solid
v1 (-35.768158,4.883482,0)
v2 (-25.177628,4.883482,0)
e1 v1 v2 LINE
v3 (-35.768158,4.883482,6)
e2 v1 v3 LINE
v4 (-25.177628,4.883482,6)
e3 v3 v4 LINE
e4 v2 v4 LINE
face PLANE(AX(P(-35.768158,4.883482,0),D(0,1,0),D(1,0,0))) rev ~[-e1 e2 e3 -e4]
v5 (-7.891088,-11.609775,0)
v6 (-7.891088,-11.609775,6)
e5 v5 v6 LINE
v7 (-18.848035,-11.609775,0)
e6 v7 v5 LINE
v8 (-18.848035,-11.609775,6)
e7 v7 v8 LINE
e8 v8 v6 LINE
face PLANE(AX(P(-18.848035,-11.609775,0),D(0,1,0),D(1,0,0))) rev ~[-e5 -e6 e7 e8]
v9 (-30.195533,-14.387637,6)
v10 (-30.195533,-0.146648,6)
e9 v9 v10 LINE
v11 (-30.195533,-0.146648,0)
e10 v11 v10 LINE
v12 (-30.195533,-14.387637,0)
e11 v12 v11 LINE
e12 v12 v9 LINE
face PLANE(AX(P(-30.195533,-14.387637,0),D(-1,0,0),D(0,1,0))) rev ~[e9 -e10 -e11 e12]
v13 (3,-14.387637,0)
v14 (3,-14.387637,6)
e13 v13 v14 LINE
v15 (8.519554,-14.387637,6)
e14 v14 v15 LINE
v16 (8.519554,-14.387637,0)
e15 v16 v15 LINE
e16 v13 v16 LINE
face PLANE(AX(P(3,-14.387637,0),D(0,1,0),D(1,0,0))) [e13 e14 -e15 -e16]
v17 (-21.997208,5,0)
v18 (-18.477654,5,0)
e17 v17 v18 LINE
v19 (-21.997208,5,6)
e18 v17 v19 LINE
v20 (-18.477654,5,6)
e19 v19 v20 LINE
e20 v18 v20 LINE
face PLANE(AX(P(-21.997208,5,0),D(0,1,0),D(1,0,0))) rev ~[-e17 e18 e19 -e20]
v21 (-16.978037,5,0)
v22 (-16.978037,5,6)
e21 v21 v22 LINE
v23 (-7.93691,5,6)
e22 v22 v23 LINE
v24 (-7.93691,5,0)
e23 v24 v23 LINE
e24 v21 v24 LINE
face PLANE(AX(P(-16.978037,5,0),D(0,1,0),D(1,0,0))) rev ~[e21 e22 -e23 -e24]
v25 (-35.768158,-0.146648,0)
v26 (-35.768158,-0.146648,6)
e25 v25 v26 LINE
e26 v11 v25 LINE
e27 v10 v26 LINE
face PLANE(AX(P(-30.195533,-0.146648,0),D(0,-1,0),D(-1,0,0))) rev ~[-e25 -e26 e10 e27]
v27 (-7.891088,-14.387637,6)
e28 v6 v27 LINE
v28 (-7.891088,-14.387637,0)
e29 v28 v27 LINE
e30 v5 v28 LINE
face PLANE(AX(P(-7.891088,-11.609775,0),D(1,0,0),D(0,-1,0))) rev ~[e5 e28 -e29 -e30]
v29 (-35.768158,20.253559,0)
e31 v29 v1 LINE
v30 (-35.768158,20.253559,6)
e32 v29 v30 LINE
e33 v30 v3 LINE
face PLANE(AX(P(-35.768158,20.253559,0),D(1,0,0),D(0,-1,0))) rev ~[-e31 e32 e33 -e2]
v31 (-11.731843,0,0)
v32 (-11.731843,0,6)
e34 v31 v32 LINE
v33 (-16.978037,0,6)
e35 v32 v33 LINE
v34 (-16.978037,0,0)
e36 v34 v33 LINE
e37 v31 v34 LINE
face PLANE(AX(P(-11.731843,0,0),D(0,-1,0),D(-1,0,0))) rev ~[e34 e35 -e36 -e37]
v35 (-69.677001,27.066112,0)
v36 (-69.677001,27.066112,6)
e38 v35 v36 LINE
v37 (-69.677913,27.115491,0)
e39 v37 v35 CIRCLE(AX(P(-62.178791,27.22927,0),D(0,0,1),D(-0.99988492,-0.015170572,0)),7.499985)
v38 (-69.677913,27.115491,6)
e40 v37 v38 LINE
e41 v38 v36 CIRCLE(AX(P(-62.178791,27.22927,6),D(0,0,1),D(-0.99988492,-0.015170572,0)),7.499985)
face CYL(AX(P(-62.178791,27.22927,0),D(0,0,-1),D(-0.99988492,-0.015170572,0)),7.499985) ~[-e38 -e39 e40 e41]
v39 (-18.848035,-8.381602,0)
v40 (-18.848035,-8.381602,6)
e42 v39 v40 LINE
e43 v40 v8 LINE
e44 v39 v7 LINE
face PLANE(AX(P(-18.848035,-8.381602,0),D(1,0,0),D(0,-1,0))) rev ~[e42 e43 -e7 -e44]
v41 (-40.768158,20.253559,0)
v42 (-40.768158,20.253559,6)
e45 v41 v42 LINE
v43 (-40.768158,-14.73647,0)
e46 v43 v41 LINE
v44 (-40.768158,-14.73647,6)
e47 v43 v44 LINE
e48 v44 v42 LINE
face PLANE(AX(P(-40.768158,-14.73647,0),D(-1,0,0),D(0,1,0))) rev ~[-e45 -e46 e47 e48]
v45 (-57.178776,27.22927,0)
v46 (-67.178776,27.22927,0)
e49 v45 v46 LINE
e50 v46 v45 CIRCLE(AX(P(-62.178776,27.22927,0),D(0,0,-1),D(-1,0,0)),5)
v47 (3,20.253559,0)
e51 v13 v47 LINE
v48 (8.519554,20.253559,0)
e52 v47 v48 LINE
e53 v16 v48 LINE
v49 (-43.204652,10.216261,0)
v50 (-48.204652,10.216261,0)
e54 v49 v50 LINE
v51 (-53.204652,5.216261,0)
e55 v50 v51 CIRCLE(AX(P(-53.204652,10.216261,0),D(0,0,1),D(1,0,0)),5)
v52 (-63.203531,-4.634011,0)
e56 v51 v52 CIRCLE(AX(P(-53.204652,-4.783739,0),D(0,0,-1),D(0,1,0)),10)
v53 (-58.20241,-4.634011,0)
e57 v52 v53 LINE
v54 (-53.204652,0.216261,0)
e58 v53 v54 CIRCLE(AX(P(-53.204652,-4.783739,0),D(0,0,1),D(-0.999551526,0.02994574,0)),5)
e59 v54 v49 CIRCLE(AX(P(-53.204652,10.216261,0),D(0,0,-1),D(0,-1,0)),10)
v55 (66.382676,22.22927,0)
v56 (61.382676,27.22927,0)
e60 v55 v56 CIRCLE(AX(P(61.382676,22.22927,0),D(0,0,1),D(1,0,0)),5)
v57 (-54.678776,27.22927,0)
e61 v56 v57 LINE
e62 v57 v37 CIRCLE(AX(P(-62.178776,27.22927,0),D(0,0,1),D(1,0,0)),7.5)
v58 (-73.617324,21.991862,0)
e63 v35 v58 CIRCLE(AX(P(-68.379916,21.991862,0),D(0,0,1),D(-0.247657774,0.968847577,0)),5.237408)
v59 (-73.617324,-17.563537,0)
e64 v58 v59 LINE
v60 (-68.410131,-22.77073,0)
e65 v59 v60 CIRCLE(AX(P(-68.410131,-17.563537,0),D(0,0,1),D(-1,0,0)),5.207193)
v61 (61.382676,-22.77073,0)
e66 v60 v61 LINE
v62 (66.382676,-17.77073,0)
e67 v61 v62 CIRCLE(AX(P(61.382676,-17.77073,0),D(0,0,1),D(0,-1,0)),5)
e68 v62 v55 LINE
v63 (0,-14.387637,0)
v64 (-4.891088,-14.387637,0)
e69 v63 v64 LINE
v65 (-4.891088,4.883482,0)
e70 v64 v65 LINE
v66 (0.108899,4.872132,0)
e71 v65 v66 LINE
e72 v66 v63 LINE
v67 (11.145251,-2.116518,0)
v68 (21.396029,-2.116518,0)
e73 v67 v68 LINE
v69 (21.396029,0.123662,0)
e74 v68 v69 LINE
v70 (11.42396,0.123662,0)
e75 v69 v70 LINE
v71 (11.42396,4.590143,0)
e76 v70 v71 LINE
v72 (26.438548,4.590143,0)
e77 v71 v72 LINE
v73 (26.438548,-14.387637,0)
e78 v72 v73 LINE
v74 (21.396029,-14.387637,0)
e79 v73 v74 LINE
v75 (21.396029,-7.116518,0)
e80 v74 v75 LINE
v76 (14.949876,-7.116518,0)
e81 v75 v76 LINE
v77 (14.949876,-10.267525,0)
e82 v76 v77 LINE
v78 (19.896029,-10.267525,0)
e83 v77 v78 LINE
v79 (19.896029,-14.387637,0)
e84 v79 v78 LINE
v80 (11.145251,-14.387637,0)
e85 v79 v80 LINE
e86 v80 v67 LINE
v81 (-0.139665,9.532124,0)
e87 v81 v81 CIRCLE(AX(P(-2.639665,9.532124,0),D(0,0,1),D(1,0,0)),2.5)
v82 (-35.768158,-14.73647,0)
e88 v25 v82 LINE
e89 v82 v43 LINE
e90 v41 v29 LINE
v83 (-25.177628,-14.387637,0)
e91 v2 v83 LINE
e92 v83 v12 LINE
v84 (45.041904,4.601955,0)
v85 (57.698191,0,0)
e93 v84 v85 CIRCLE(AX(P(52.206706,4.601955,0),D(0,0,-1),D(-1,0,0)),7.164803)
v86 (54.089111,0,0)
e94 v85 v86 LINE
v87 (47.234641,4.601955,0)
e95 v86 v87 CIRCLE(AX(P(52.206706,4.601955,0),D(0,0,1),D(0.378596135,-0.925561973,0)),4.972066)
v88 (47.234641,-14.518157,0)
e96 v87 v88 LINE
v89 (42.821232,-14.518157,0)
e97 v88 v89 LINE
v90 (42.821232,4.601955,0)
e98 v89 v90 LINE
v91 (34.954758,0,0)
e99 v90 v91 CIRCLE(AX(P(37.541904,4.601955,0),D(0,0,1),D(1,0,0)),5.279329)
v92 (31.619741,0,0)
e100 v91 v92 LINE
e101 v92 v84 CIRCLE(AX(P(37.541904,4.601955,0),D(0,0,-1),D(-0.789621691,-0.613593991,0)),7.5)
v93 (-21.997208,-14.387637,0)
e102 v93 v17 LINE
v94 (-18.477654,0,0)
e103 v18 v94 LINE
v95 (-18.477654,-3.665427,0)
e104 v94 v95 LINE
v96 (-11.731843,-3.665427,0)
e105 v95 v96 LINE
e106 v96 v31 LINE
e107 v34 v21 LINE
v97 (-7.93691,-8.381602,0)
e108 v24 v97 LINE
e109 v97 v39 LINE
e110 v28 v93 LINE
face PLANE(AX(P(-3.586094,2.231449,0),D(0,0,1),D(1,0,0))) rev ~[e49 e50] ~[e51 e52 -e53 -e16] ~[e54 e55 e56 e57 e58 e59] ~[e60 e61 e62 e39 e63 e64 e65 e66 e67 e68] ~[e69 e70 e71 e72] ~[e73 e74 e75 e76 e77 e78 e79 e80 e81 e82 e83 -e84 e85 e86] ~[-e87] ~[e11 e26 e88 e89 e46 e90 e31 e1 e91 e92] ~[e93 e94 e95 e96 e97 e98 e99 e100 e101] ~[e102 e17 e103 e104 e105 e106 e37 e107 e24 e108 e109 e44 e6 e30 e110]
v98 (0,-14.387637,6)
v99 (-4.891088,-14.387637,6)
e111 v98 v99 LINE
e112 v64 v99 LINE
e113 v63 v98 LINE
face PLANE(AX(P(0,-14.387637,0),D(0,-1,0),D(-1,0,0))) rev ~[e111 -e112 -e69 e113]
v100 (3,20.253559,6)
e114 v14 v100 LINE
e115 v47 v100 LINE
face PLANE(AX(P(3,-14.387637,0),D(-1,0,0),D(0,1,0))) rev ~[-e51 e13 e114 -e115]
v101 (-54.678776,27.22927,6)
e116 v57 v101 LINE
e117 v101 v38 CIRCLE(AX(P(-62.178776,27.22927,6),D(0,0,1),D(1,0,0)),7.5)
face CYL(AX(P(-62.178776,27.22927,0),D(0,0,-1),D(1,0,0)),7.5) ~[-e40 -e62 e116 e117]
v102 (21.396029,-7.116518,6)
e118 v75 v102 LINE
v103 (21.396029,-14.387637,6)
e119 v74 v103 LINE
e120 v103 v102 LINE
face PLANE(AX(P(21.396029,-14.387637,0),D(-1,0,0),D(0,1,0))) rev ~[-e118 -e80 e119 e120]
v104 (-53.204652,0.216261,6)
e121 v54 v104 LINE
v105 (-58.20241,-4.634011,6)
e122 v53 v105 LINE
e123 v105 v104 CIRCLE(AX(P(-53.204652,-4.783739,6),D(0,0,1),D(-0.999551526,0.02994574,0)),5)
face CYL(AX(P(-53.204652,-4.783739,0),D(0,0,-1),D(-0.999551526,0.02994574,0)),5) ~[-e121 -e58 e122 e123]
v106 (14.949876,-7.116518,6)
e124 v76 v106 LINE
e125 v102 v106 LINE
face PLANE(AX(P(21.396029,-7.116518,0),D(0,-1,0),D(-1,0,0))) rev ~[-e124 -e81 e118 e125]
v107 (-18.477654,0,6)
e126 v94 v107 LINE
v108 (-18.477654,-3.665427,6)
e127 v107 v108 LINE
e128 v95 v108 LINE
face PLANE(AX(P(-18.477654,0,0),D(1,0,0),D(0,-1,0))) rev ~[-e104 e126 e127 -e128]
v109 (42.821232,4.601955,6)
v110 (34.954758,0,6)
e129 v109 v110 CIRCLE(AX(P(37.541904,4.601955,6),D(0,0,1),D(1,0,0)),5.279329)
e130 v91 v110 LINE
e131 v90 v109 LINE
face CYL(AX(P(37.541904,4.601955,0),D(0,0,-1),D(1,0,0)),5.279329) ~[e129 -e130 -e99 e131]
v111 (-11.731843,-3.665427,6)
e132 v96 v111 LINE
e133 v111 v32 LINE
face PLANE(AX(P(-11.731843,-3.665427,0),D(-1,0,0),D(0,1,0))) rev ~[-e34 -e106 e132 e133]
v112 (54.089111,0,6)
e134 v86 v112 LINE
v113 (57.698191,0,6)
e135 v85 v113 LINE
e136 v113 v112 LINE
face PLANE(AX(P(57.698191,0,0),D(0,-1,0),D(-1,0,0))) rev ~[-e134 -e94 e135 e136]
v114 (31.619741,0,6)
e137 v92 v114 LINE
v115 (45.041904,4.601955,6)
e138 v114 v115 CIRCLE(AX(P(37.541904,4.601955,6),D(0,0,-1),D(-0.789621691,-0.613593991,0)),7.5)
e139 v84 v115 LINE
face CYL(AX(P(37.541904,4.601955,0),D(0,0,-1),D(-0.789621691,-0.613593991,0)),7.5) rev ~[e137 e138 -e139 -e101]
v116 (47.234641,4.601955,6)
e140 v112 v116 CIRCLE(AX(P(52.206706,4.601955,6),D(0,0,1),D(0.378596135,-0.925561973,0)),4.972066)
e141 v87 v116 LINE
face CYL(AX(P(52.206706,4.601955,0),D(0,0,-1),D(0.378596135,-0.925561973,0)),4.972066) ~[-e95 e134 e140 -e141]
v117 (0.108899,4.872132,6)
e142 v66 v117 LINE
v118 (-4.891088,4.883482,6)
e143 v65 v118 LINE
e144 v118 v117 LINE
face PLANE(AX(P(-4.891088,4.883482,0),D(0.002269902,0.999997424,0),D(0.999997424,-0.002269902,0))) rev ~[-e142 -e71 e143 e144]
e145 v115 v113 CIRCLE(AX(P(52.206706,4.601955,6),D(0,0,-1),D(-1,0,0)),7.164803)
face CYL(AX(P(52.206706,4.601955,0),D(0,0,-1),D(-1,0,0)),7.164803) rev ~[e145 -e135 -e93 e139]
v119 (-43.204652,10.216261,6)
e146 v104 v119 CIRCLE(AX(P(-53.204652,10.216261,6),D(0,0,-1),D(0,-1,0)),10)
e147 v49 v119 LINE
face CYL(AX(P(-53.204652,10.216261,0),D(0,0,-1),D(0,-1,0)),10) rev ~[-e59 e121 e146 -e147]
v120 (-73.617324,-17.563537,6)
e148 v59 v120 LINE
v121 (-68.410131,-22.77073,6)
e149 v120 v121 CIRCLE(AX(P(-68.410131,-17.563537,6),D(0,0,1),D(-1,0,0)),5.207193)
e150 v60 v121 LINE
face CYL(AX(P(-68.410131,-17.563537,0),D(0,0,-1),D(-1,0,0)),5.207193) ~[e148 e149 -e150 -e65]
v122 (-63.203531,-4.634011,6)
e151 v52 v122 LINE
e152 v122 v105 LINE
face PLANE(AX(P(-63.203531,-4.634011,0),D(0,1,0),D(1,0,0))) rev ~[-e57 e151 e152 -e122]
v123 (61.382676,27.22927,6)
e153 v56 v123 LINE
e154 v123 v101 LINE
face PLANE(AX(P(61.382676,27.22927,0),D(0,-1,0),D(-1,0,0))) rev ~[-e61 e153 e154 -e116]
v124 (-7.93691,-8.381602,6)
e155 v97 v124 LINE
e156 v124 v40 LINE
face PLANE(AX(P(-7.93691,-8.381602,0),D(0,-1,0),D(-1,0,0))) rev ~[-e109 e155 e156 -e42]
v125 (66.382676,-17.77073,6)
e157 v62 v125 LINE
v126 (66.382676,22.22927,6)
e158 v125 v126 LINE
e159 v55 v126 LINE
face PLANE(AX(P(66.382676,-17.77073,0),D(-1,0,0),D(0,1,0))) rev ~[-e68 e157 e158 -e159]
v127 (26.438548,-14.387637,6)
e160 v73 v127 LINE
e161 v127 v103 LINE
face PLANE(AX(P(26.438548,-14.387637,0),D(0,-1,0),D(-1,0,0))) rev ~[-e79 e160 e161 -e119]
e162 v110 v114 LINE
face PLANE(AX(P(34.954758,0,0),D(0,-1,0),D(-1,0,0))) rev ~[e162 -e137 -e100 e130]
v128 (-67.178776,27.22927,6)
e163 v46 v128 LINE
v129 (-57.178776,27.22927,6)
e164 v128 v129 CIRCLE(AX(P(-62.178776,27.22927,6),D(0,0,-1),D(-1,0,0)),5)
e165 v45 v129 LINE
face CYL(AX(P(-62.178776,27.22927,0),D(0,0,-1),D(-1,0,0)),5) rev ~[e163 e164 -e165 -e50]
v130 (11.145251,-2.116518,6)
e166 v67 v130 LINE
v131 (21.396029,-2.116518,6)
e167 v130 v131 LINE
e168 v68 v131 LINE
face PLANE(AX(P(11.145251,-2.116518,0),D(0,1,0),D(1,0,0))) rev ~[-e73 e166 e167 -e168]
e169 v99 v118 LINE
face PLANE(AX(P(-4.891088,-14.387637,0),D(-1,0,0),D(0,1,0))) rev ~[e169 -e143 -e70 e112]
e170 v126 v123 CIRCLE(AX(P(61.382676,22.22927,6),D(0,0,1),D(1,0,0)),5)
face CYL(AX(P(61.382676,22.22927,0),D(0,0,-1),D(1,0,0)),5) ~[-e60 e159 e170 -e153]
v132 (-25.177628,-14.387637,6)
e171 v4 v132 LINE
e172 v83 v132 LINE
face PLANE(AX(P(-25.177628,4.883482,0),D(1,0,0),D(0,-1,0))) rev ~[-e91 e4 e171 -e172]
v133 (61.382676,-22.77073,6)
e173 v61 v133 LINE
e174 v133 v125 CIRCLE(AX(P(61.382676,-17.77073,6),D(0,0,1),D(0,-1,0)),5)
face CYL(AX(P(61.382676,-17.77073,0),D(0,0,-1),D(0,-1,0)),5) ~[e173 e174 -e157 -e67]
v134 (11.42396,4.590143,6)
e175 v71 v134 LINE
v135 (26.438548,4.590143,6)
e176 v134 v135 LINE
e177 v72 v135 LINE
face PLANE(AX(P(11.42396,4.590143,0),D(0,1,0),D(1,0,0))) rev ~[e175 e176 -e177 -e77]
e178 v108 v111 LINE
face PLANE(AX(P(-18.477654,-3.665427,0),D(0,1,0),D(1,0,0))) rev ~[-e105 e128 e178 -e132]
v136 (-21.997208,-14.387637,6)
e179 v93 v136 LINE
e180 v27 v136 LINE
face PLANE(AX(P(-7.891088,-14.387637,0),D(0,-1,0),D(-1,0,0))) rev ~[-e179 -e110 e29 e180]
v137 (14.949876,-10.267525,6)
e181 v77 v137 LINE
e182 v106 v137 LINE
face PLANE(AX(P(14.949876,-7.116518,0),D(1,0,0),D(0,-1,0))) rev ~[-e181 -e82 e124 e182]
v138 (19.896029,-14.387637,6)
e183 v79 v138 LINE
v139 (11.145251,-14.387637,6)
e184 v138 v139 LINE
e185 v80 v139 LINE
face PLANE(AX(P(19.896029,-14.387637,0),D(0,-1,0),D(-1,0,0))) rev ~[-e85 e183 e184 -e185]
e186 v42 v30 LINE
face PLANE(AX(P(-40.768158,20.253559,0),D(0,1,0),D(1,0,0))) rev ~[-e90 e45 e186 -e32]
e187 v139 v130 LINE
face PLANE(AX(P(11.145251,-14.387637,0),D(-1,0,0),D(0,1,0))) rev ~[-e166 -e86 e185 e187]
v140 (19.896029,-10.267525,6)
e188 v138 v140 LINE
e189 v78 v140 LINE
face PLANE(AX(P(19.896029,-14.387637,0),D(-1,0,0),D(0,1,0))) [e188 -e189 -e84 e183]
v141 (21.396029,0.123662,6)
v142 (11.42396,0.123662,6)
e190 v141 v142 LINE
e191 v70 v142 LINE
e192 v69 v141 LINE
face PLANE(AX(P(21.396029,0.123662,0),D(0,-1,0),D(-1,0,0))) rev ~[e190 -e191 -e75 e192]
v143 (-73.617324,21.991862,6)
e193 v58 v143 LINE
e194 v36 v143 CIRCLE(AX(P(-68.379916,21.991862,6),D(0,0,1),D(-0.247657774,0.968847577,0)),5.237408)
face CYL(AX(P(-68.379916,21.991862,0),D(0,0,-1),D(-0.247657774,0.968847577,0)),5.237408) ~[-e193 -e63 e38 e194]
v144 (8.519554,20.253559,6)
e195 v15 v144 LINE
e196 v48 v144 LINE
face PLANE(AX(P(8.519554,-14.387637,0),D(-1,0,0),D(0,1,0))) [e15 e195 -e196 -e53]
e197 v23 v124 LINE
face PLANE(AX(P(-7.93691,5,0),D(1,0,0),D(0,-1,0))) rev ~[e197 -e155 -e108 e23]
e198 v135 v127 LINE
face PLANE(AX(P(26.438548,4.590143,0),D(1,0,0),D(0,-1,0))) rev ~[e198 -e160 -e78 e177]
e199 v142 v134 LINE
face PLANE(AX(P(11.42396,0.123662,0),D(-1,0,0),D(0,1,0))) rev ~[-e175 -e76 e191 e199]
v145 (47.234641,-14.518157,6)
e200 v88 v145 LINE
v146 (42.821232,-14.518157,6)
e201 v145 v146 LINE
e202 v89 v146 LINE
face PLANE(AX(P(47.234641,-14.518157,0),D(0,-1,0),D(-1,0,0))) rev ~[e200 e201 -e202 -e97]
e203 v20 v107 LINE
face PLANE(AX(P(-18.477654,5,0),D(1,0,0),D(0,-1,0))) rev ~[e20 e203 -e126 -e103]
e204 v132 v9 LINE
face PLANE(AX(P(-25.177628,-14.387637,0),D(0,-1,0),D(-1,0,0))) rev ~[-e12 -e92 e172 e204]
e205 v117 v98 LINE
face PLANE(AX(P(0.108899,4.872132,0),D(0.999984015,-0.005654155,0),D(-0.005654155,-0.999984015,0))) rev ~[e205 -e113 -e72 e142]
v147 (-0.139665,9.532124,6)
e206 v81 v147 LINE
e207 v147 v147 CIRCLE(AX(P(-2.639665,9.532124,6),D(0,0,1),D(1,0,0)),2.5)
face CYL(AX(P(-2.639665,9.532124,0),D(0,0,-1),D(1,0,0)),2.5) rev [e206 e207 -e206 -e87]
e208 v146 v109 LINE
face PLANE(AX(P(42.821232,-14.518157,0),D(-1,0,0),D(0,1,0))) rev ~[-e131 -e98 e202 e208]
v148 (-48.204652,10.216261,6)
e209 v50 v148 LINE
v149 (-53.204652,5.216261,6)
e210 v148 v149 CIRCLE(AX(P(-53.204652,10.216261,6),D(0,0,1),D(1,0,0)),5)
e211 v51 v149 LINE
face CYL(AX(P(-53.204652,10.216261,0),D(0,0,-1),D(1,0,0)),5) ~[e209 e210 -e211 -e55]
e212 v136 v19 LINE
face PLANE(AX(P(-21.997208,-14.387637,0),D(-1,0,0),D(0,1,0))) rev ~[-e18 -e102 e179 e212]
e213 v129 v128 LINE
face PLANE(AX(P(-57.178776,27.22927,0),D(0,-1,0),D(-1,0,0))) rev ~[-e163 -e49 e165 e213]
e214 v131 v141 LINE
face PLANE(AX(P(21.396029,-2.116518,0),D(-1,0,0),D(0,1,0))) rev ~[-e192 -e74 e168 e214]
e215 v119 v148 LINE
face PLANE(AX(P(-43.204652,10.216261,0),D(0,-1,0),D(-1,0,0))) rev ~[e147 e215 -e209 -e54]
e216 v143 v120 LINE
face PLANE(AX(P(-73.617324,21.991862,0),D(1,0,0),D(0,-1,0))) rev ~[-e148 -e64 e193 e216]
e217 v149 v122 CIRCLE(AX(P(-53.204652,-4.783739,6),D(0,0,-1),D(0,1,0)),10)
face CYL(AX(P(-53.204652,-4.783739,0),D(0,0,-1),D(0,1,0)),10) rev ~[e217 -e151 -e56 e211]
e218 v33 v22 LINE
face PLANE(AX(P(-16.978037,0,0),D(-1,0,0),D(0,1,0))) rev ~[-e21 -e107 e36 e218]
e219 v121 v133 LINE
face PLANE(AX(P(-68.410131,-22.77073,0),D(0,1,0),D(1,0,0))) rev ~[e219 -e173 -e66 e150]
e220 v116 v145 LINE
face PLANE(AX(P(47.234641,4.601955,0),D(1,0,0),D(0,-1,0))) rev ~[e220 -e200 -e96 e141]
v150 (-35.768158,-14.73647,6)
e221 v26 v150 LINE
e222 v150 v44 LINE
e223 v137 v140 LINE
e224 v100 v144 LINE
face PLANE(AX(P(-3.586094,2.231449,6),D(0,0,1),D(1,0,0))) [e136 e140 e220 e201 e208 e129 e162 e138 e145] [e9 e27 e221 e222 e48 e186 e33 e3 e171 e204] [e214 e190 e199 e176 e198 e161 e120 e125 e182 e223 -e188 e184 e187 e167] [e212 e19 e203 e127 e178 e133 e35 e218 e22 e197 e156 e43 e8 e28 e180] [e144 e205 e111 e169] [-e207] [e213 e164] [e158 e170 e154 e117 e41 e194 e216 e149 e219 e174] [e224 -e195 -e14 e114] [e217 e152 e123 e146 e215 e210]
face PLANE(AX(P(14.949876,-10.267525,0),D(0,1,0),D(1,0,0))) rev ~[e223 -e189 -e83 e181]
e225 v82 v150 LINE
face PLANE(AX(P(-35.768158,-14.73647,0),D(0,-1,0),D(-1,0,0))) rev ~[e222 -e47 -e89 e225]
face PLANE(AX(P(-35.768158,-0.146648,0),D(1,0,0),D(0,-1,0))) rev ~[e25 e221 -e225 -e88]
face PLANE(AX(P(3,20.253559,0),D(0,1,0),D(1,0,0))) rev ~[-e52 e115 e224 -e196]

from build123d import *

# Parameters (mm, degrees)
F0_W     = 5.5195543896
F0_H     = 34.641196678
F0_R     = 2.5
F0_W_2   = 1.4996174723
F0_H_2   = 4.8834816366
F0_W_3   = 1.5
F0_H_3   = 4.1201120429
F0_H_4   = 0.1165183634
F1_DEPTH = 6


# Not quite as in the source:
# - a feature names something its author has since deleted; it is built from what else it names


with BuildPart() as f1:
    # F0 (on Top) → F1 (new body)
    with BuildSketch(Plane.XY):
        with BuildLine():
            Line((-67.1787756681, 27.2292699475), (-68.3799158582, 27.2292699475))
            ThreePointArc((-68.3799158582, 27.2292699475), (-69.0335690068, 27.1883203713), (-69.6770007567, 27.0661119853))
            ThreePointArc((-69.6770007567, 27.0661119853), (-72.5165696868, 25.2041102534), (-73.6173242331, 21.9918615726))
            Line((-73.6173242331, 21.9918615726), (-73.6173242331, -17.563536772))
            ThreePointArc((-73.6173242331, -17.563536772), (-72.0921726321, -21.2455784516), (-68.4101309525, -22.7707300525))
            Line((-68.4101309525, -22.7707300525), (61.3826757669, -22.7707300525))
            ThreePointArc((61.3826757669, -22.7707300525), (64.9182096729, -21.3062639585), (66.3826757669, -17.7707300525))
            Line((66.3826757669, -17.7707300525), (66.3826757669, 22.2292699475))
            ThreePointArc((66.3826757669, 22.2292699475), (64.9182096729, 25.7648038534), (61.3826757669, 27.2292699475))
            Line((61.3826757669, 27.2292699475), (-54.6787756681, 27.2292699475))
            Line((-54.6787756681, 27.2292699475), (-57.1787756681, 27.2292699475))
            Line((-57.1787756681, 27.2292699475), (-67.1787756681, 27.2292699475))
        make_face()
        with BuildLine():
            ThreePointArc((-68.3379918337, 19.7292699475), (-67.6057587867, 21.4970369004), (-65.8379918337, 22.2292699475))
            Line((-65.8379918337, 22.2292699475), (58.8826757669, 22.2292699475))
            ThreePointArc((58.8826757669, 22.2292699475), (60.6504427199, 21.4970369004), (61.3826757669, 19.7292699475))
            Line((61.3826757669, 19.7292699475), (61.3826757669, -15.2707300525))
            ThreePointArc((61.3826757669, -15.2707300525), (60.6504427199, -17.0384970055), (58.8826757669, -17.7707300525))
            Line((58.8826757669, -17.7707300525), (-65.8379918337, -17.7707300525))
            ThreePointArc((-65.8379918337, -17.7707300525), (-67.6057587867, -17.0384970055), (-68.3379918337, -15.2707300525))
            Line((-68.3379918337, -15.2707300525), (-68.3379918337, 19.7292699475))
        make_face(mode=Mode.SUBTRACT)
        with BuildLine():
            Line((58.8826757669, 22.2292699475), (-65.8379918337, 22.2292699475))
            ThreePointArc((-65.8379918337, 22.2292699475), (-67.6057587867, 21.4970369004), (-68.3379918337, 19.7292699475))
            Line((-68.3379918337, 19.7292699475), (-68.3379918337, -15.2707300525))
            ThreePointArc((-68.3379918337, -15.2707300525), (-67.6057587867, -17.0384970055), (-65.8379918337, -17.7707300525))
            Line((-65.8379918337, -17.7707300525), (58.8826757669, -17.7707300525))
            ThreePointArc((58.8826757669, -17.7707300525), (60.6504427199, -17.0384970055), (61.3826757669, -15.2707300525))
            Line((61.3826757669, -15.2707300525), (61.3826757669, 19.7292699475))
            ThreePointArc((61.3826757669, 19.7292699475), (60.6504427199, 21.4970369004), (58.8826757669, 22.2292699475))
        make_face()
        with BuildLine():
            ThreePointArc((-53.204651922, 0.2162606642), (-60.2757197339, 17.287328476), (-43.204651922, 10.2162606642))
            Line((-43.204651922, 10.2162606642), (-48.204651922, 10.2162606642))
            ThreePointArc((-48.204651922, 10.2162606642), (-56.7401858279, 13.7517945701), (-53.204651922, 5.2162606642))
            ThreePointArc((-53.204651922, 5.2162606642), (-46.1867208519, -11.9075475516), (-63.203530925, -4.6340106369))
            Line((-63.203530925, -4.6340106369), (-58.2024095508, -4.6340106369))
            ThreePointArc((-58.2024095508, -4.6340106369), (-49.7224574627, -8.371819846), (-53.204651922, 0.2162606642))
        make_face(mode=Mode.SUBTRACT)
        Polygon((-7.8910876493, -14.387637473), (-21.9972077757, -14.387637473), (-21.9972077757, 4.8834816366), (-21.9972077757, 5), (-18.4776540846, 5), (-16.9780366123, 5), (-7.9369102418, 5), (-7.9369102418, 4.8834816366), (-7.9369102418, -8.3816020689), (-18.8480350176, -8.3816020689), (-18.8480350176, -11.6097754424), (-7.8910876493, -11.6097754424), align=None, mode=Mode.SUBTRACT)
        Polygon((-40.7681576908, -14.7364697516), (-40.7681576908, 20.253559205), (-35.7681576908, 20.253559205), (-35.7681576908, 4.8834816366), (-25.1815660298, 4.8834816366), (-25.1776284749, 4.8834816366), (-25.1776284749, -14.387637473), (-30.1955331862, -14.387637473), (-30.1955331862, -0.1466480026), (-35.7681576908, -0.1466480026), (-35.7681576908, -14.7364697516), align=None, mode=Mode.SUBTRACT)
        Polygon((0, -14.387637473), (-4.8910876493, -14.387637473), (-4.8910876493, 4.8834816366), (0.1088994695, 4.8721321267), align=None, mode=Mode.SUBTRACT)
        Polygon((19.8960285634, -14.387637473), (11.1452508718, -14.387637473), (11.1452508718, -2.1165183634), (21.3960285634, -2.1165183634), (21.3960285634, 0.1236622645), (11.4239600822, 0.1236622645), (11.4239600822, 4.5901425229), (26.3825752896, 4.5901425229), (26.4385476336, 4.5901425229), (26.4385476336, -14.387637473), (21.3960285634, -14.387637473), align=None, mode=Mode.SUBTRACT)
        with Locations((5.7597771948, 2.932960866)):
            Rectangle(F0_W, F0_H, mode=Mode.SUBTRACT)
        with BuildLine():
            Line((47.2346405685, -14.5181566477), (42.8212322295, -14.5181566477))
            Line((42.8212322295, -14.5181566477), (42.8212322295, 4.6019549295))
            ThreePointArc((42.8212322295, 4.6019549295), (34.8761091537, 9.1588015867), (34.9547580095, 0))
            Line((34.9547580095, 0), (31.6197408739, 0))
            ThreePointArc((31.6197408739, 0), (35.1094377398, 11.6965380784), (45.0419035554, 4.6019549295))
            ThreePointArc((45.0419035554, 4.6019549295), (54.6550720871, 11.3354460366), (57.6981913518, 0))
            Line((57.6981913518, 0), (54.089111107, 0))
            ThreePointArc((54.089111107, 0), (54.9781676596, 8.7299615773), (47.2346405685, 4.6019549295))
            Line((47.2346405685, 4.6019549295), (47.2346405685, -14.5181566477))
        make_face(mode=Mode.SUBTRACT)
        with Locations((-2.6396652684, 9.5321238041)):
            Circle(F0_R, mode=Mode.SUBTRACT)
        with BuildLine():
            Line((-68.6173242331, 27.2292699475), (-68.3799158582, 27.2292699475))
            Line((-68.3799158582, 27.2292699475), (-67.1787756681, 27.2292699475))
            ThreePointArc((-67.1787756681, 27.2292699475), (-62.1787756681, 32.2292699475), (-57.1787756681, 27.2292699475))
            Line((-57.1787756681, 27.2292699475), (-54.6787756681, 27.2292699475))
            ThreePointArc((-54.6787756681, 27.2292699475), (-62.2356669727, 34.7290541697), (-69.6779125693, 27.1154906119))
            ThreePointArc((-69.6779125693, 27.1154906119), (-69.1506612176, 27.2007437391), (-68.6173242331, 27.2292699475))
        make_face()
        Polygon((-16.9780366123, 0), (-18.4776540846, 0), (-18.4776540846, -3.6654266296), (-11.7318434641, -3.6654266296), (-11.7318434641, 0), align=None)
        Polygon((14.9498761296, -10.2675254301), (19.8960285634, -10.2675254301), (21.3960285634, -10.2675254301), (21.3960285634, -7.1165183634), (14.9498761296, -7.1165183634), align=None)
        with Locations((-17.7278453484, 2.4417408183)):
            Rectangle(F0_W_2, F0_H_2)
        with Locations((20.6460285634, -12.3275814516)):
            Rectangle(F0_W_3, F0_H_3)
        with Locations((-17.7278453484, 4.9417408183)):
            Rectangle(F0_W_2, F0_H_4)
        with BuildLine():
            ThreePointArc((-69.6770007567, 27.0661119853), (-69.0335690068, 27.1883203713), (-68.3799158582, 27.2292699475))
            Line((-68.3799158582, 27.2292699475), (-68.6173242331, 27.2292699475))
            ThreePointArc((-68.6173242331, 27.2292699475), (-69.1506612176, 27.2007437391), (-69.6779125693, 27.1154906119))
            ThreePointArc((-69.6779125693, 27.1154906119), (-69.6774973076, 27.0908005481), (-69.6770007567, 27.0661119853))
        make_face()
    extrude(amount=F1_DEPTH)


solid = f1.part
